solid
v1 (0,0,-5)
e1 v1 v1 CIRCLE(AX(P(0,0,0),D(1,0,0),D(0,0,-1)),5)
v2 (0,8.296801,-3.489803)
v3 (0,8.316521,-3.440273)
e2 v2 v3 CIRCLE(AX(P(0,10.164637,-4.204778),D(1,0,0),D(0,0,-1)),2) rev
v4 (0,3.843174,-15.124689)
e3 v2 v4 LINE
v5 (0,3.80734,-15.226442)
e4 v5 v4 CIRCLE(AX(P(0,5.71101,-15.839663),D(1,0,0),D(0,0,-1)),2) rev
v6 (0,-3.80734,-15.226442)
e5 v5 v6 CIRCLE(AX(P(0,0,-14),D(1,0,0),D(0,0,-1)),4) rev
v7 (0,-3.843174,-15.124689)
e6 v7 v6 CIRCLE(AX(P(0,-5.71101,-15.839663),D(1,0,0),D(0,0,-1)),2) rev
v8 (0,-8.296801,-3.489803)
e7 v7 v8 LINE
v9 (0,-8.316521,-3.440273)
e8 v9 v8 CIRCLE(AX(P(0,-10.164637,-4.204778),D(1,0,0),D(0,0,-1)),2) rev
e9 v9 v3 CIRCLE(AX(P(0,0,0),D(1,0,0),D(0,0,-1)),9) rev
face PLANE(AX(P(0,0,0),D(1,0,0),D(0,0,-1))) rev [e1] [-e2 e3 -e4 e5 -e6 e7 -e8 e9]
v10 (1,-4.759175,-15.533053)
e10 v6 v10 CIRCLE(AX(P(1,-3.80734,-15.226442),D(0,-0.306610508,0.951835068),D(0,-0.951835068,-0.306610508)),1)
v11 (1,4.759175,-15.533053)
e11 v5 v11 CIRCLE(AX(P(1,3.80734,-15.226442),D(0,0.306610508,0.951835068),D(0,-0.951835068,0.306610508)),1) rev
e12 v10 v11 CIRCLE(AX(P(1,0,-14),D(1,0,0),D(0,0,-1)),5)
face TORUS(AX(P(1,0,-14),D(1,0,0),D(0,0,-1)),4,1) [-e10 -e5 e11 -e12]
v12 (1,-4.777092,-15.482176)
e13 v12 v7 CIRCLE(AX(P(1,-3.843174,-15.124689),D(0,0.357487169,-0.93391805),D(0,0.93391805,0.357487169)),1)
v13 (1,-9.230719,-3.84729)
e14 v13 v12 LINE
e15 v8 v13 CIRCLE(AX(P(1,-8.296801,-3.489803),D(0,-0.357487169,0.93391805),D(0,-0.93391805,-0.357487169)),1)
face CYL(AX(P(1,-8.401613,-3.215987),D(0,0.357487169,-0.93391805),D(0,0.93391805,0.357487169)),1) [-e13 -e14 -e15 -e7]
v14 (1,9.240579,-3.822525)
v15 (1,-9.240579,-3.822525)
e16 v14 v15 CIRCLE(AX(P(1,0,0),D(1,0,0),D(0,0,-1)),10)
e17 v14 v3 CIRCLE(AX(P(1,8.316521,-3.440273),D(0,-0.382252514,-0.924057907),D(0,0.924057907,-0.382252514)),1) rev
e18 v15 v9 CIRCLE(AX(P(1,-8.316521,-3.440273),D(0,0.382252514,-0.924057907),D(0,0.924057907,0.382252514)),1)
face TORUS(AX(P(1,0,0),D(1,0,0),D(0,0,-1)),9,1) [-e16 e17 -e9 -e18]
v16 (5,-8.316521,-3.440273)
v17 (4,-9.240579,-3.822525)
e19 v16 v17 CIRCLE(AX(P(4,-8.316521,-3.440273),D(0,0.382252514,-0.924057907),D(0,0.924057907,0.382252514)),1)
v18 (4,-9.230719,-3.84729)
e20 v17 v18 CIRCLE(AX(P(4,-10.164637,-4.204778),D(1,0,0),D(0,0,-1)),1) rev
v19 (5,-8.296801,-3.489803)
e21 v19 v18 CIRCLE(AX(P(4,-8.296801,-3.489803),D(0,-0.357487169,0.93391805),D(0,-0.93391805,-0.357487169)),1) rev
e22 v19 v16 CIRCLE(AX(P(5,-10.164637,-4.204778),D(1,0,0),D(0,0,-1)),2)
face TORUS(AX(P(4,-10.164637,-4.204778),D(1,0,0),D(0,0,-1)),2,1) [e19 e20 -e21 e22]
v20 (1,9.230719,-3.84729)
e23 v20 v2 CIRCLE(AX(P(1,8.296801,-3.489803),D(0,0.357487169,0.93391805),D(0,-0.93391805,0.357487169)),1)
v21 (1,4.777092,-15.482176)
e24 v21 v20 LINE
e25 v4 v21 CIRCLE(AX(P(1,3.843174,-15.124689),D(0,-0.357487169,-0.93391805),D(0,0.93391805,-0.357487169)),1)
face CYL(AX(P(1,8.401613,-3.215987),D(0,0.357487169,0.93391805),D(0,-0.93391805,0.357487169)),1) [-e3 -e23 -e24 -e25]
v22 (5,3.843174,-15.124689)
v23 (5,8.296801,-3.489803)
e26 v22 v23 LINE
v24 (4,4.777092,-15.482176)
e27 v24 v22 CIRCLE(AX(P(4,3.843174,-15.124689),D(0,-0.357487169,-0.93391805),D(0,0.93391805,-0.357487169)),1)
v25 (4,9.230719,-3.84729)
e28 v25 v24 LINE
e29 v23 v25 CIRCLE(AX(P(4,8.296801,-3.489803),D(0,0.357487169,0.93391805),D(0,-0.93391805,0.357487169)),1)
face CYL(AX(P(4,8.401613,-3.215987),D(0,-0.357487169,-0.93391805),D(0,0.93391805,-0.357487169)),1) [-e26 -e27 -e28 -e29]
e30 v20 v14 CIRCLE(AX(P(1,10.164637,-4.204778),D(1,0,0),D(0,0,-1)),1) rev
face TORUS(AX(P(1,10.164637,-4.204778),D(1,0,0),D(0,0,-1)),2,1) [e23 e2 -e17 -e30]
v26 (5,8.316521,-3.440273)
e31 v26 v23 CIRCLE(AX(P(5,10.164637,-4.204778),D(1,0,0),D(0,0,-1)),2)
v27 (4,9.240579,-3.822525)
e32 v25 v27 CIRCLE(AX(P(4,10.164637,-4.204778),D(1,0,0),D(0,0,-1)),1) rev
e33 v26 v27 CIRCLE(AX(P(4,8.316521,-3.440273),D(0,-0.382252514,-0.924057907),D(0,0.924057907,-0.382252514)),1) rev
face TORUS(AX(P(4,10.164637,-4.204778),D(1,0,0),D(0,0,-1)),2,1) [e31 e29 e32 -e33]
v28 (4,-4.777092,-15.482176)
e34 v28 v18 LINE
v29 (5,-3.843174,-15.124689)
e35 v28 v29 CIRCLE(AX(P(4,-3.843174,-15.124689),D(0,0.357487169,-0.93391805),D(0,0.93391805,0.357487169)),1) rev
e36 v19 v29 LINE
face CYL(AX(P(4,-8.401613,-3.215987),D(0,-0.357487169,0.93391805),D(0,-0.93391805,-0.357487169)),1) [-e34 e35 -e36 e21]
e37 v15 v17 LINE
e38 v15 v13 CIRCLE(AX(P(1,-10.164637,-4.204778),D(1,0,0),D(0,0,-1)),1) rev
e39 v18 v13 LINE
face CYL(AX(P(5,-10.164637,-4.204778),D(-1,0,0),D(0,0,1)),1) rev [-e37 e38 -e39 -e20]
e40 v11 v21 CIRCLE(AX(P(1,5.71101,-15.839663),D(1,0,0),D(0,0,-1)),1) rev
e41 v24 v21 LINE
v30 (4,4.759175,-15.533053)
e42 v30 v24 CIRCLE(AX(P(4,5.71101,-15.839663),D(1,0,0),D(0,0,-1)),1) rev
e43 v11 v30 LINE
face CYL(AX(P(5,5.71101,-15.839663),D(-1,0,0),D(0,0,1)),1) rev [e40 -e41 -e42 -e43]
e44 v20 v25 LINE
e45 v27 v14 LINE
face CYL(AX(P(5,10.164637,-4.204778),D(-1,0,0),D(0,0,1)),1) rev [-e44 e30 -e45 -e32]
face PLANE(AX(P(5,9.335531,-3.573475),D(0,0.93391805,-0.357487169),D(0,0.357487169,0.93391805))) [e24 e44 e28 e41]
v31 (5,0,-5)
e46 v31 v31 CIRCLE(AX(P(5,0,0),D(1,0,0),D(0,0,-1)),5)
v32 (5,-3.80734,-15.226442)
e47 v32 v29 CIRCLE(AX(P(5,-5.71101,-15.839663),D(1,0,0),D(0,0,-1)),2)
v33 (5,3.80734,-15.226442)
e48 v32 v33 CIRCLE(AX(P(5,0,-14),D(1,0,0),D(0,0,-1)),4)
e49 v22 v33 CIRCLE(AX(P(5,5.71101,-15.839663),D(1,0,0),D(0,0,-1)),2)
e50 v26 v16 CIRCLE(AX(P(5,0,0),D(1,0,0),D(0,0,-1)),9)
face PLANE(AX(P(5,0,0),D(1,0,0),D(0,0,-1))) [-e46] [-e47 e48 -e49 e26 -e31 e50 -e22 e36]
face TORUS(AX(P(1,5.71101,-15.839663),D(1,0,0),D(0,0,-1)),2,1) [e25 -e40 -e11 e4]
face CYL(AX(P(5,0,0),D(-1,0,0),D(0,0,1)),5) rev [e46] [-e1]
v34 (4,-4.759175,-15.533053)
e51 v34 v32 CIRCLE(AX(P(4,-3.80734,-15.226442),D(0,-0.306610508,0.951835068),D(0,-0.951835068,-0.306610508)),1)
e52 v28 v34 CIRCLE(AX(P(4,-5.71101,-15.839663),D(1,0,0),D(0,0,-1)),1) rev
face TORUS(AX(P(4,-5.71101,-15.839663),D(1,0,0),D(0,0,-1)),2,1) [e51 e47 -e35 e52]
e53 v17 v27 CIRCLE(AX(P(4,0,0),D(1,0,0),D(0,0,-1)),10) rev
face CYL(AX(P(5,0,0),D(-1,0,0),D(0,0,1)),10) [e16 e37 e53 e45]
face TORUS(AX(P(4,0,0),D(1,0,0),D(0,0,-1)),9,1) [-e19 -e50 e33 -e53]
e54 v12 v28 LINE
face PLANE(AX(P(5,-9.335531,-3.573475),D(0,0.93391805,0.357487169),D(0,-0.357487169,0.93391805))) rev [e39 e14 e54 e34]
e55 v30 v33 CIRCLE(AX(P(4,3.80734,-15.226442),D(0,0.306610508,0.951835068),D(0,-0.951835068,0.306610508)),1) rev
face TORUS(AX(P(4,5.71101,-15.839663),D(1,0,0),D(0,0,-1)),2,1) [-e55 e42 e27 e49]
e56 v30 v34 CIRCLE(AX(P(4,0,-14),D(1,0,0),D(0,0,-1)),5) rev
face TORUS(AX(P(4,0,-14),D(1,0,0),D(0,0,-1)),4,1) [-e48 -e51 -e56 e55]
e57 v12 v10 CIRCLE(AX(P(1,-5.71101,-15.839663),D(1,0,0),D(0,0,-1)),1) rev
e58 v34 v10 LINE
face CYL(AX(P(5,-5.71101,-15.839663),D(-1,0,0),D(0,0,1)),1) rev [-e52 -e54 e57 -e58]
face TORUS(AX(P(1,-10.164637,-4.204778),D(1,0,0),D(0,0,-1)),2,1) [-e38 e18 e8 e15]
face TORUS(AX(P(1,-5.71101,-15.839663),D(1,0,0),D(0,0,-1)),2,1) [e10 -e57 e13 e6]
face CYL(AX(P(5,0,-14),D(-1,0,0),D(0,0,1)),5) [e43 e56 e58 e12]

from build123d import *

# Parameters (mm, degrees)
SKETCH1_R           = 5
BOSS_EXTRUDE1_DEPTH = 5
FILLET2_R           = 1


with BuildPart() as part:
    # Sketch1 → Boss-Extrude1 (new body)
    with BuildSketch(Plane(origin=(0, 0, 0), x_dir=(0, 0, -1), z_dir=(1, 0, 0))):
        with BuildLine():
            Line((3.834545484, -9.235597487), (15.508521108, -4.767007874))
            ThreePointArc((15.508521108, -4.767007874), (19, 0), (15.508521108, 4.767007874))
            Line((15.508521108, 4.767007874), (3.834545484, 9.235597487))
            ThreePointArc((3.834545484, 9.235597487), (-10, 0), (3.834545484, -9.235597487))
        make_face()
        Circle(SKETCH1_R, mode=Mode.SUBTRACT)
    extrude(amount=BOSS_EXTRUDE1_DEPTH)

    # Fillet2
    # the kernel refuses this fillet: 1 mm, written as the material it adds along each edge
    with BuildSketch(Plane(origin=(0, -9.235597487, -3.834545484), x_dir=(0, -0.3828536121528857, 0.9238090233708955), z_dir=(1, 0, 0))) as fillet2_piece_1:
        with BuildLine():
            CenterArc((0.013662307, 0.999999788), FILLET2_R, 268.43540008, 1.527324084)
            Line((-0.01364172, 0.000372613), (0, 0))
            ThreePointArc((0, 0), (0.00650586, 2.116e-06), (0.013011721, 0))
        make_face()
    extrude(amount=5)
    with BuildSketch(Plane(origin=(0, 9.235597487, -3.834545484), x_dir=(0, -0.35748716903167743, -0.9339180499260719), z_dir=(1, 0, 0))) as fillet2_piece_2:
        with BuildLine():
            CenterArc((0.013646808, 1), FILLET2_R, 268.472675916, 1.527324084)
            ThreePointArc((-0.013006869, 0.000355272), (-0.006503377, 0.000179752), (0, 0))
            Line((0, 0), (0.013646808, 0))
        make_face()
    extrude(amount=5)
    with BuildSketch(Plane(origin=(0, 4.767007874, -15.508521108), x_dir=(0, 0.3574871690316874, 0.9339180499260681), z_dir=(1, 0, 0))) as fillet2_piece_3:
        with BuildLine():
            CenterArc((0.028209357, -1), FILLET2_R, 90, 3.090872231)
            ThreePointArc((-0.025710379, -0.001454727), (-0.012854253, -0.000743916), (0, 0))
            Line((0, 0), (0.028209357, 0))
        make_face()
    extrude(amount=5)
    with BuildSketch(Plane(origin=(0, -4.767007874, -15.508521108), x_dir=(0, -0.3574871690316535, 0.933918049926081), z_dir=(1, 0, 0))) as fillet2_piece_4:
        with BuildLine():
            CenterArc((0.028209357, 1), FILLET2_R, 266.909127769, 3.090872231)
            ThreePointArc((-0.025710379, 0.001454727), (-0.012854253, 0.000743916), (0, 0))
            Line((0, 0), (0.028209357, 0))
        make_face()
    extrude(amount=5)
    # the kernel refuses this fillet: 1 mm, written as the material it takes off along each edge
    with BuildSketch(Plane(origin=(5, 0, -14), x_dir=(0, -0.9518350677637516, -0.3066105082595415), z_dir=(0, -0.3066105082595415, 0.9518350677637516))) as fillet2_2_piece_1:
        with BuildLine():
            CenterArc((5 - FILLET2_R, -FILLET2_R), FILLET2_R, 0, 90)
            Line((5, -FILLET2_R), (5, 0))
            Line((5, 0), (5 - FILLET2_R, 0))
        make_face()
    revolve(axis=Axis((5, 0, -14), (1, 0, 0)), revolution_arc=144.289835586, mode=Mode.SUBTRACT)
    with BuildSketch(Plane(origin=(5, 4.777092357, -15.482175881), x_dir=(-1, 0, 0), z_dir=(0, 0.3574871690316615, 0.933918049926078)), Plane(origin=(0, -9.230718928, -3.847290484), x_dir=(0, 0.9339180499260781, 0.35748716903166156), z_dir=(0, 0.3574871690316615, -0.933918049926078))) as fillet2_2_piece_2:
        with BuildLine():
            CenterArc((FILLET2_R, FILLET2_R), FILLET2_R, 180, 90)
            Line((0, FILLET2_R), (0, 0))
            Line((0, 0), (FILLET2_R, 0))
        make_face()
    extrude(amount=12.458143836, mode=Mode.SUBTRACT)
    with BuildSketch(Plane(origin=(5, 0, 0), x_dir=(0, 0.9240579070749063, -0.38225251388623166), z_dir=(0, -0.38225251388623166, -0.9240579070749063))) as fillet2_2_piece_3:
        with BuildLine():
            CenterArc((10 - FILLET2_R, -FILLET2_R), FILLET2_R, 0, 90)
            Line((10, -FILLET2_R), (10, 0))
            Line((10, 0), (10 - FILLET2_R, 0))
        make_face()
    revolve(axis=Axis((5, 0, 0), (1, 0, 0)), revolution_arc=224.946557044, mode=Mode.SUBTRACT)
    with BuildSketch(Plane(origin=(5, -9.230718928, -3.847290484), x_dir=(0, 0.9339180499260781, 0.35748716903166156), z_dir=(0, 0.3574871690316615, -0.933918049926078)), Plane(origin=(0, 4.777092357, -15.482175881), x_dir=(1, 0, 0), z_dir=(0, 0.3574871690316615, 0.933918049926078))) as fillet2_2_piece_4:
        with BuildLine():
            CenterArc((FILLET2_R, -FILLET2_R), FILLET2_R, 90, 90)
            Line((0, -FILLET2_R), (0, 0))
            Line((0, 0), (FILLET2_R, 0))
        make_face()
    extrude(amount=12.458143836, mode=Mode.SUBTRACT)
    with BuildSketch(Plane(origin=(0, 0, 0), x_dir=(0, 0.9240579070749063, -0.38225251388623166), z_dir=(0, -0.38225251388623166, -0.9240579070749063))) as fillet2_2_piece_5:
        with BuildLine():
            CenterArc((10 - FILLET2_R, FILLET2_R), FILLET2_R, 270, 90)
            Line((10, FILLET2_R), (10, 0))
            Line((10, 0), (10 - FILLET2_R, 0))
        make_face()
    revolve(axis=Axis((0, 0, 0), (1, 0, 0)), revolution_arc=224.946557044, mode=Mode.SUBTRACT)
    with BuildSketch(Plane(origin=(0, 0, -14), x_dir=(0, -0.9518350677637516, -0.3066105082595415), z_dir=(0, -0.3066105082595415, 0.9518350677637516))) as fillet2_2_piece_6:
        with BuildLine():
            CenterArc((5 - FILLET2_R, FILLET2_R), FILLET2_R, 270, 90)
            Line((5, FILLET2_R), (5, 0))
            Line((5, 0), (5 - FILLET2_R, 0))
        make_face()
    revolve(axis=Axis((0, 0, -14), (1, 0, 0)), revolution_arc=144.289835586, mode=Mode.SUBTRACT)
    with BuildSketch(Plane(origin=(0, -10.164636978, -4.204777653), x_dir=(0, 0.9240579070749084, 0.38225251388622655), z_dir=(0, -0.38225251388622655, 0.9240579070749084))) as fillet2_2_piece_7:
        with BuildLine():
            CenterArc((1 + FILLET2_R, -FILLET2_R), FILLET2_R, 90, 90)
            Line((1, -FILLET2_R), (1, 0))
            Line((1, 0), (1 + FILLET2_R, 0))
        make_face()
    revolve(axis=Axis((0, -10.164636978, -4.204777653), (-1, 0, 0)), revolution_arc=1.527324084, mode=Mode.SUBTRACT)
    with BuildSketch(Plane(origin=(0, -5.711010407, -15.83966305), x_dir=(0, 0.9339180499260777, 0.35748716903166233), z_dir=(0, -0.35748716903166233, 0.9339180499260777))) as fillet2_2_piece_8:
        with BuildLine():
            CenterArc((1 + FILLET2_R, -FILLET2_R), FILLET2_R, 90, 90)
            Line((1, -FILLET2_R), (1, 0))
            Line((1, 0), (1 + FILLET2_R, 0))
        make_face()
    revolve(axis=Axis((0, -5.711010407, -15.83966305), (-1, 0, 0)), revolution_arc=3.090872231, mode=Mode.SUBTRACT)
    with BuildSketch(Plane(origin=(0, 5.711010407, -15.83966305), x_dir=(0, -0.9339180499260777, 0.35748716903166233), z_dir=(0, 0.35748716903166233, 0.9339180499260777))) as fillet2_2_piece_9:
        with BuildLine():
            CenterArc((1 + FILLET2_R, FILLET2_R), FILLET2_R, 180, 90)
            Line((1, FILLET2_R), (1, 0))
            Line((1, 0), (1 + FILLET2_R, 0))
        make_face()
    revolve(axis=Axis((0, 5.711010407, -15.83966305), (1, 0, 0)), revolution_arc=3.090872231, mode=Mode.SUBTRACT)
    with BuildSketch(Plane(origin=(0, 10.164636978, -4.204777653), x_dir=(0, -0.9339180499260781, 0.35748716903166156), z_dir=(0, -0.35748716903166156, -0.9339180499260781))) as fillet2_2_piece_10:
        with BuildLine():
            CenterArc((1 + FILLET2_R, -FILLET2_R), FILLET2_R, 90, 90)
            Line((1, -FILLET2_R), (1, 0))
            Line((1, 0), (1 + FILLET2_R, 0))
        make_face()
    revolve(axis=Axis((0, 10.164636978, -4.204777653), (-1, 0, 0)), revolution_arc=1.527324084, mode=Mode.SUBTRACT)
    with BuildSketch(Plane(origin=(5, -10.164636978, -4.204777653), x_dir=(0, 0.9240579070749084, 0.38225251388622655), z_dir=(0, -0.38225251388622655, 0.9240579070749084))) as fillet2_2_piece_11:
        with BuildLine():
            CenterArc((1 + FILLET2_R, FILLET2_R), FILLET2_R, 180, 90)
            Line((1, FILLET2_R), (1, 0))
            Line((1, 0), (1 + FILLET2_R, 0))
        make_face()
    revolve(axis=Axis((5, -10.164636978, -4.204777653), (-1, 0, 0)), revolution_arc=1.527324084, mode=Mode.SUBTRACT)
    with BuildSketch(Plane(origin=(5, -5.711010407, -15.83966305), x_dir=(0, 0.9339180499260777, 0.35748716903166233), z_dir=(0, -0.35748716903166233, 0.9339180499260777))) as fillet2_2_piece_12:
        with BuildLine():
            CenterArc((1 + FILLET2_R, FILLET2_R), FILLET2_R, 180, 90)
            Line((1, FILLET2_R), (1, 0))
            Line((1, 0), (1 + FILLET2_R, 0))
        make_face()
    revolve(axis=Axis((5, -5.711010407, -15.83966305), (-1, 0, 0)), revolution_arc=3.090872231, mode=Mode.SUBTRACT)
    with BuildSketch(Plane(origin=(5, 10.164636978, -4.204777653), x_dir=(0, -0.9339180499260781, 0.35748716903166156), z_dir=(0, -0.35748716903166156, -0.9339180499260781))) as fillet2_2_piece_13:
        with BuildLine():
            CenterArc((1 + FILLET2_R, FILLET2_R), FILLET2_R, 180, 90)
            Line((1 + FILLET2_R, 0), (1, 0))
            Line((1, 0), (1, FILLET2_R))
        make_face()
    revolve(axis=Axis((5, 10.164636978, -4.204777653), (-1, 0, 0)), revolution_arc=1.527324084, mode=Mode.SUBTRACT)
    with BuildSketch(Plane(origin=(5, 5.711010407, -15.83966305), x_dir=(0, -0.9339180499260777, 0.35748716903166233), z_dir=(0, 0.35748716903166233, 0.9339180499260777))) as fillet2_2_piece_14:
        with BuildLine():
            CenterArc((1 + FILLET2_R, -FILLET2_R), FILLET2_R, 90, 90)
            Line((1, -FILLET2_R), (1, 0))
            Line((1, 0), (1 + FILLET2_R, 0))
        make_face()
    revolve(axis=Axis((5, 5.711010407, -15.83966305), (1, 0, 0)), revolution_arc=3.090872231, mode=Mode.SUBTRACT)


solid = part.part
